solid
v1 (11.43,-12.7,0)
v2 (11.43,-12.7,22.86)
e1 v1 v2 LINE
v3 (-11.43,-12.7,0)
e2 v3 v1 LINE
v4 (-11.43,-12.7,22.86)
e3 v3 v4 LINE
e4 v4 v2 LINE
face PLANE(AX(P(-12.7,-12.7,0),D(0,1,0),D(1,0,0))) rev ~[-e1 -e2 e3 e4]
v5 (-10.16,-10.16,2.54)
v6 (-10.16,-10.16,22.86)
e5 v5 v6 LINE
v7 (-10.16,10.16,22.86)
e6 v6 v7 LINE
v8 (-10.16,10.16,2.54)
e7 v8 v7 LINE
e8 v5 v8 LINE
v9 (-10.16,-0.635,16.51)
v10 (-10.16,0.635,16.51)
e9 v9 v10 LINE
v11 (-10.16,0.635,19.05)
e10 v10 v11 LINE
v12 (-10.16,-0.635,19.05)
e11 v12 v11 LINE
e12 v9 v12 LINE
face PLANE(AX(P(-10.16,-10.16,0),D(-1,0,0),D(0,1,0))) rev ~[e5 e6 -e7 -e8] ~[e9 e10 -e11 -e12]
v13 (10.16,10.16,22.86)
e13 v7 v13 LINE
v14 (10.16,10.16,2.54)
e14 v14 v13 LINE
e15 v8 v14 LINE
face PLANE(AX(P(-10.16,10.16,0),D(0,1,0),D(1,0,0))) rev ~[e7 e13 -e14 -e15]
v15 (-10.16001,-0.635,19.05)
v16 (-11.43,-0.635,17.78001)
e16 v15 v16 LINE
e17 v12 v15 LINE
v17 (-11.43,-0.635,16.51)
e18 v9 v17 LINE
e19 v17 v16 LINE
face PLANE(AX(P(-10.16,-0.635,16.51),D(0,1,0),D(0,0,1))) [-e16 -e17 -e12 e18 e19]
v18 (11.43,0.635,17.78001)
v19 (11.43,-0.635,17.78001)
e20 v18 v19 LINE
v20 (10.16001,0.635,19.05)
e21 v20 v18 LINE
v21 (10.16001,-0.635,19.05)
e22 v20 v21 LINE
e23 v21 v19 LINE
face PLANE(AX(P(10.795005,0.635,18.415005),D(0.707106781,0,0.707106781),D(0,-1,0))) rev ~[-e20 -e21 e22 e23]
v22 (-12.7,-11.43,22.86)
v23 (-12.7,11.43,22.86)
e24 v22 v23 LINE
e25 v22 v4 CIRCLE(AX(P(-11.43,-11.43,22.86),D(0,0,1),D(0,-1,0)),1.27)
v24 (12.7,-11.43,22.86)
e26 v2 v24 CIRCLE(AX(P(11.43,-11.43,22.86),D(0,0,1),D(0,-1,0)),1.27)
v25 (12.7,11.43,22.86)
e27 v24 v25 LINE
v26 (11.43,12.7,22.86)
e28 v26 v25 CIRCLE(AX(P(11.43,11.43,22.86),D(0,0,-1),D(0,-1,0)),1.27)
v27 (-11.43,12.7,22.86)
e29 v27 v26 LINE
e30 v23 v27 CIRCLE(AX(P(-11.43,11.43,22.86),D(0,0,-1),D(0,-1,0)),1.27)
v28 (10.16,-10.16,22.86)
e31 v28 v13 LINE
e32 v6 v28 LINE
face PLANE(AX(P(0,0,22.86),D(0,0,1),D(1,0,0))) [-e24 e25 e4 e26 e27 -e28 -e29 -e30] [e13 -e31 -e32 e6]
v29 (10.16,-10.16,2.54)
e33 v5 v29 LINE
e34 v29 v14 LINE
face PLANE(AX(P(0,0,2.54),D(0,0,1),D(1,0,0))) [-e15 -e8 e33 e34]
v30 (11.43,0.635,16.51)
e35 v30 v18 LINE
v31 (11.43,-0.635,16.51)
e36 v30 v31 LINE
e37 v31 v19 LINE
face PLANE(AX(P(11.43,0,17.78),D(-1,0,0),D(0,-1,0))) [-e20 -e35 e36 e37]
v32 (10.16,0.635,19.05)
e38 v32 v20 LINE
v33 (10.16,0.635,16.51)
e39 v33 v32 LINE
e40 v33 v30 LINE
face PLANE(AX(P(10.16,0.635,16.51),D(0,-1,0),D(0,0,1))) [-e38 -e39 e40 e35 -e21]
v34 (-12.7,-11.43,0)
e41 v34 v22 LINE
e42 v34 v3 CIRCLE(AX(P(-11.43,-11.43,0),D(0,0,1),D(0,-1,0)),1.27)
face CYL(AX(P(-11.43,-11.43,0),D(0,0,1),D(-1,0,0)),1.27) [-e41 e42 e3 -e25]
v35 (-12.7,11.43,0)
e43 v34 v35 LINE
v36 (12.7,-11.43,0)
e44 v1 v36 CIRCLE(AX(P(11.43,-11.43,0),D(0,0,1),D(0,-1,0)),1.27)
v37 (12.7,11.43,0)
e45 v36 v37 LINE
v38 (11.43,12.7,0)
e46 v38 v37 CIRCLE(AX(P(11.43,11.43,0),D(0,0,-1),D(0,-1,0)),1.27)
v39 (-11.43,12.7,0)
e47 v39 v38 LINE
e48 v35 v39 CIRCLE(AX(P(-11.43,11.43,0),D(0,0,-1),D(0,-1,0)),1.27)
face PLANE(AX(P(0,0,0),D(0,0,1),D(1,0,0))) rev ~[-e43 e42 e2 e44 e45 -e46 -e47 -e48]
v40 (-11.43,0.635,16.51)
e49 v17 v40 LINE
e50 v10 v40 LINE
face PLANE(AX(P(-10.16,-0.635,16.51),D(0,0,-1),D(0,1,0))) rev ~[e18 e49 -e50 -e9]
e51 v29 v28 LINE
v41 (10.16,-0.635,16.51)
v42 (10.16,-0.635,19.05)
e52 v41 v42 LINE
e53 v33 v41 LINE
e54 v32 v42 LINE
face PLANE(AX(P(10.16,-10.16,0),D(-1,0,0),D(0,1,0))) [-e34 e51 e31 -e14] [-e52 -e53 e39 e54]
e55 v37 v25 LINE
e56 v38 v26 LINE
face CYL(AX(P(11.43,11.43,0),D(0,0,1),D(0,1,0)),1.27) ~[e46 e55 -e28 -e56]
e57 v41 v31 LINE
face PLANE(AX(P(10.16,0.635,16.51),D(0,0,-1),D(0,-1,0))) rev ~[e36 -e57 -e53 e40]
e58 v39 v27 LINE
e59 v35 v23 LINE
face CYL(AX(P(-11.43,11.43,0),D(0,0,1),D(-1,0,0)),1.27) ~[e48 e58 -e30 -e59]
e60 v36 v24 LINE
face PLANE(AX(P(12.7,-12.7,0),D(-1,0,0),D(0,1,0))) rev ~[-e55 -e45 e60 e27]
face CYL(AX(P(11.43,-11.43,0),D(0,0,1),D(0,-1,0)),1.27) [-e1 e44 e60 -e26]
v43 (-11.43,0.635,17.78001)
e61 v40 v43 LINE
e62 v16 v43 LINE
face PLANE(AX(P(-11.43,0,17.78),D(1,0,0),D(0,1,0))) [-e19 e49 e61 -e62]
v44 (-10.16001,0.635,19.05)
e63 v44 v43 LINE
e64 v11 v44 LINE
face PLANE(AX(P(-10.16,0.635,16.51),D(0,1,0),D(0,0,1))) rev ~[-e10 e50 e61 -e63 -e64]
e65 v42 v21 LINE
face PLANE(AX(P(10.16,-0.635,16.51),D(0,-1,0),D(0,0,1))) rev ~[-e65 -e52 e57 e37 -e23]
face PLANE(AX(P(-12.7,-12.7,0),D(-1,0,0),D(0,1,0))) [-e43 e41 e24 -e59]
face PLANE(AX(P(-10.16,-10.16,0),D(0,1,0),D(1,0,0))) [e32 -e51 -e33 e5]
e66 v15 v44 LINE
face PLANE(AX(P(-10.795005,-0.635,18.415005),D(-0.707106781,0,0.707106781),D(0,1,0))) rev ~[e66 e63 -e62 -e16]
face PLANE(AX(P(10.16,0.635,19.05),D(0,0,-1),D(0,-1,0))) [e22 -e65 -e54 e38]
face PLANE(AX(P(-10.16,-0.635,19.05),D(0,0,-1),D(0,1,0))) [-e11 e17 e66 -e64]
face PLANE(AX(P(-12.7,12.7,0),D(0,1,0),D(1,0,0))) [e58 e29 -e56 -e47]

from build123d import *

# Parameters (mm, degrees)
F0_W     = 20.32
F0_H     = 20.32
F1_DEPTH = 2.54
F0_W_2   = 25.4
F0_H_2   = 25.4
F2_DEPTH = 22.86
F3_W     = 1.27
F3_H     = 2.54
F3_W_2   = 0.635
F3_H_2   = 1.27
F4_DEPTH = 1.27
F5_SIZE  = 1.26999
F6_W     = 1.27
F6_H     = 2.54
F7_DEPTH = 1.27
F8_SIZE  = 1.26999
F9_R     = 1.27


# Not quite as in the source:
# - a fillet or chamfer is up to 0.001 mm smaller than in the source, because OpenCascade refuses the exact size


with BuildPart() as f1:
    # F0 (on Top) → F1 (new body)
    with BuildSketch(Plane.XY):
        Rectangle(F0_W, F0_H)
    extrude(amount=F1_DEPTH)

    # F0 (on Top) → F2 (join)
    with BuildSketch(Plane.XY):
        Rectangle(F0_W_2, F0_H_2)
        Rectangle(F0_W, F0_H, mode=Mode.SUBTRACT)
    extrude(amount=F2_DEPTH)

    # F3 (on face) → F4 (cut)
    with BuildSketch(Plane.YZ.offset(-10.16)):
        with Locations((0, 17.78)):
            Rectangle(F3_W, F3_H)
        with Locations((0, 17.78)):
            Rectangle(F3_W_2, F3_H_2, mode=Mode.SUBTRACT)
        with Locations((0, 17.78)):
            Rectangle(F3_W_2, F3_H_2)
    extrude(amount=-F4_DEPTH, mode=Mode.SUBTRACT)

    # F5 (size 1.27 in the source; OpenCascade refuses exactly that, so slightly less here)
    f5_edges = [f1.edges().sort_by_distance(p)[0] for p in [
        (-11.43, 0, 19.05),
    ]]
    chamfer(f5_edges, length=F5_SIZE)

    # F6 (on face) → F7 (cut)
    with BuildSketch(Plane(origin=(10.16, 0, 0), x_dir=(0, -1, 0), z_dir=(-1, 0, 0))):
        with Locations((0, 17.78)):
            Rectangle(F6_W, F6_H)
    extrude(amount=-F7_DEPTH, mode=Mode.SUBTRACT)

    # F8 (size 1.27 in the source; OpenCascade refuses exactly that, so slightly less here)
    f8_edges = [f1.edges().sort_by_distance(p)[0] for p in [
        (11.43, 0, 19.05),
    ]]
    chamfer(f8_edges, length=F8_SIZE)

    # F9
    f9_edges = [f1.edges().sort_by_distance(p)[0] for p in [
        (-12.7, -12.7, 11.43),
        (12.7, -12.7, 11.43),
        (12.7, 12.7, 11.43),
        (-12.7, 12.7, 11.43),
    ]]
    fillet(f9_edges, radius=F9_R)


solid = f1.part
